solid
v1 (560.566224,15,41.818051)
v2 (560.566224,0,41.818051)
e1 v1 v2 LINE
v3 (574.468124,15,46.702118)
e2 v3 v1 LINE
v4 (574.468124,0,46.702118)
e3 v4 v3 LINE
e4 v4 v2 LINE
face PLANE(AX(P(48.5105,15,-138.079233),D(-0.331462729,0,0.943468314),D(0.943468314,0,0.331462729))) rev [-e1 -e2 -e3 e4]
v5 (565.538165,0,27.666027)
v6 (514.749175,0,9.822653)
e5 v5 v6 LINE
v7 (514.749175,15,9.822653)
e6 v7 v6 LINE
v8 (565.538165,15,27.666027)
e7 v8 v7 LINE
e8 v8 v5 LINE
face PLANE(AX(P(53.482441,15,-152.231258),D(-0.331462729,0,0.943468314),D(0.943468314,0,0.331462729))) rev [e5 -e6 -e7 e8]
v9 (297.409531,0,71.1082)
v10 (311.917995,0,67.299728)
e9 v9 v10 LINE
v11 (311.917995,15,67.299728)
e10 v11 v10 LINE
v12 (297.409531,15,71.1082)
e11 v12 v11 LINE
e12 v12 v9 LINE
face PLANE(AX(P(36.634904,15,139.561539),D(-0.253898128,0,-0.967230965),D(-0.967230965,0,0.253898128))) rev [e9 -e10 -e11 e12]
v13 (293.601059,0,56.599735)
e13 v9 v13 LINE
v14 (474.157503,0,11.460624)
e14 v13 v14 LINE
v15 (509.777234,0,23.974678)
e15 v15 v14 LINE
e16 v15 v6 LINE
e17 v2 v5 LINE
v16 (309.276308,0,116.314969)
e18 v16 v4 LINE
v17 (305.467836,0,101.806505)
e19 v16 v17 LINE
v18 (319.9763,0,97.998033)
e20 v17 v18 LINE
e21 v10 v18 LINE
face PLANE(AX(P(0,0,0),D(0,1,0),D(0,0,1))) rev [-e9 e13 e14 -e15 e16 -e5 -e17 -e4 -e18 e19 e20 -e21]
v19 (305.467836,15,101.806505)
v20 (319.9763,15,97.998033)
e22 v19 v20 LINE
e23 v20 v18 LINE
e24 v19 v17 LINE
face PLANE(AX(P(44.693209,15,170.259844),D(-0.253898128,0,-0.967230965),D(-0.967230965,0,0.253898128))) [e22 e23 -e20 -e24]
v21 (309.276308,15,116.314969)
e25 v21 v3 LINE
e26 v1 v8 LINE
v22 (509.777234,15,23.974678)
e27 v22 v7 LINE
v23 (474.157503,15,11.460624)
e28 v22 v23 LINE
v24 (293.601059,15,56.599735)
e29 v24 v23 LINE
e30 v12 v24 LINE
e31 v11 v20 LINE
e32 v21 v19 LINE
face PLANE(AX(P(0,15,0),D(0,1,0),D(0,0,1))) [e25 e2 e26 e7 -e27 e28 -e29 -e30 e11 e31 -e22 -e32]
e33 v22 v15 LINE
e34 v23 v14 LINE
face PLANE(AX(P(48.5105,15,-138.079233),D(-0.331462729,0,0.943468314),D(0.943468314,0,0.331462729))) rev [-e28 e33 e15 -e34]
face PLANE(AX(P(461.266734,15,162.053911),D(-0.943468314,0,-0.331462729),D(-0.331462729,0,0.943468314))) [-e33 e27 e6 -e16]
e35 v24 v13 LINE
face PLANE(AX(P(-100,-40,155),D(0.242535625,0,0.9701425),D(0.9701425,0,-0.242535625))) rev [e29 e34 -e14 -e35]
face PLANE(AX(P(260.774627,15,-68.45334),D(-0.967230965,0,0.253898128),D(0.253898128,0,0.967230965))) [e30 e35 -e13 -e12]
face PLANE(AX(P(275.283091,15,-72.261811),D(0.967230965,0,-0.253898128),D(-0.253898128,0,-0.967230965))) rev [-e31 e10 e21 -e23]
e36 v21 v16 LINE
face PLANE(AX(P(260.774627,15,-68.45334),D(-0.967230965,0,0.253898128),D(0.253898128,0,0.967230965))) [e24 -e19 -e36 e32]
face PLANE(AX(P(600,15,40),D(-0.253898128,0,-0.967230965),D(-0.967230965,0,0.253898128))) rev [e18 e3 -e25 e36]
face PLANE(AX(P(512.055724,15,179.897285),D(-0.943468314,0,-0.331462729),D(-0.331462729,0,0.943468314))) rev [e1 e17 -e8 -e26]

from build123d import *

# Parameters (mm, degrees)
BOSS_EXTRUDE1_DEPTH             = 15
BOSS_EXTRUDE2_REACH             = 1239.023
BOSS_EXTRUDE2_DIRECTION_2_REACH = 1239.023
CUT_EXTRUDE2_DEPTH              = 1238.578280352
CUT_EXTRUDE2_DEPTH_BACK         = 1238.578280352
SKETCH5_W                       = 40
SKETCH5_H                       = 40
CUT_EXTRUDE3_DEPTH              = 1238.578280352
BOSS_EXTRUDE4_DEPTH             = 75
CUT_EXTRUDE4_DEPTH              = 1241.107934819
CUT_EXTRUDE4_DEPTH_BACK         = 1241.107934819
SKETCH8_W                       = 15
SKETCH8_H                       = 73.7
FILLET1_R                       = 5
CUT_EXTRUDE5_DEPTH              = 1241.107934819
CUT_EXTRUDE5_DEPTH_BACK         = 1241.107934819
SKETCH9_W                       = 25
SKETCH9_H                       = 15
SKETCH9_W_2                     = 15
CUT_EXTRUDE6_DEPTH              = 1241.107934819
CUT_EXTRUDE6_DEPTH_BACK         = 1241.107934819
SKETCH10_W                      = 1728.920732784
SKETCH10_H                      = 178.853868908
SKETCH10_W_2                    = 1650
SKETCH10_H_2                    = 15
SKETCH11_W                      = 1852.680615207
SKETCH11_H                      = 1075.927112831
CUT_EXTRUDE7_DEPTH              = 1238.022635201


with BuildPart() as part:
    # Sketch1 → Boss-Extrude1 (new body)
    with BuildSketch(Plane(origin=(0, 0, 0), x_dir=(1, 0, 0), z_dir=(0, 1, 0))):
        Polygon((-450, 300), (-400, 300), (-200, 250), (600, 40), (1200, 40), (1200, -40), (600, -40), (-200, -250), (-400, -300), (-450, -300), align=None)
    extrude(amount=BOSS_EXTRUDE1_DEPTH)

    # Boss-Extrude2: up to this face of the body (flat: up to its plane)
    boss_extrude2_end = Plane(part.part.faces().sort_by_distance((-425, 7.5, 300))[0])
    # Sketch2 → Boss-Extrude2 (add, up to the picked face)
    with BuildSketch(Plane.XY, mode=Mode.PRIVATE) as boss_extrude2_sk1:
        with BuildLine():
            Line((-425, 0), (-450, 0))
            Line((-450, 0), (-450, -40))
            Line((-450, -40), (-440, -40))
            Line((-440, -40), (-440, -15))
            ThreePointArc((-440, -15), (-435.606601718, -4.393398282), (-425, 0))
        make_face()
    boss_extrude2_tool1 = split(extrude(boss_extrude2_sk1.sketch, amount=BOSS_EXTRUDE2_REACH, mode=Mode.PRIVATE), bisect_by=boss_extrude2_end, keep=Keep.BOTH, mode=Mode.PRIVATE)
    # Sketch2 → Boss-Extrude2 (add, up to the picked face)
    with BuildSketch(Plane.XY, mode=Mode.PRIVATE) as boss_extrude2_sk2:
        with BuildLine():
            Line((-400, 0), (-425, 0))
            ThreePointArc((-425, 0), (-414.393398282, -4.393398282), (-410, -15))
            Line((-410, -15), (-410, -40))
            Line((-410, -40), (-400, -40))
            Line((-400, -40), (-400, 0))
        make_face()
    boss_extrude2_tool2 = split(extrude(boss_extrude2_sk2.sketch, amount=BOSS_EXTRUDE2_REACH, mode=Mode.PRIVATE), bisect_by=boss_extrude2_end, keep=Keep.BOTH, mode=Mode.PRIVATE)
    add(boss_extrude2_tool1.solids().sort_by(Axis((-444.100555, -18.206662, 0), (0, 0, 1)))[0])
    add(boss_extrude2_tool2.solids().sort_by(Axis((-405.899445, -18.206662, 0), (0, 0, 1)))[0])

    # Boss-Extrude2 direction 2: up to this face of the body (flat: up to its plane)
    boss_extrude2_direction_2_end = Plane(part.part.faces().sort_by_distance((-425, 7.5, -300))[0])
    # Sketch2 → Boss-Extrude2 direction 2 (add, up to the picked face)
    with BuildSketch(Plane.XY, mode=Mode.PRIVATE) as boss_extrude2_direction_2_sk1:
        with BuildLine():
            Line((-425, 0), (-450, 0))
            Line((-450, 0), (-450, -40))
            Line((-450, -40), (-440, -40))
            Line((-440, -40), (-440, -15))
            ThreePointArc((-440, -15), (-435.606601718, -4.393398282), (-425, 0))
        make_face()
    boss_extrude2_direction_2_tool1 = split(extrude(boss_extrude2_direction_2_sk1.sketch, amount=-BOSS_EXTRUDE2_DIRECTION_2_REACH, mode=Mode.PRIVATE), bisect_by=boss_extrude2_direction_2_end, keep=Keep.BOTH, mode=Mode.PRIVATE)
    # Sketch2 → Boss-Extrude2 direction 2 (add, up to the picked face)
    with BuildSketch(Plane.XY, mode=Mode.PRIVATE) as boss_extrude2_direction_2_sk2:
        with BuildLine():
            Line((-400, 0), (-425, 0))
            ThreePointArc((-425, 0), (-414.393398282, -4.393398282), (-410, -15))
            Line((-410, -15), (-410, -40))
            Line((-410, -40), (-400, -40))
            Line((-400, -40), (-400, 0))
        make_face()
    boss_extrude2_direction_2_tool2 = split(extrude(boss_extrude2_direction_2_sk2.sketch, amount=-BOSS_EXTRUDE2_DIRECTION_2_REACH, mode=Mode.PRIVATE), bisect_by=boss_extrude2_direction_2_end, keep=Keep.BOTH, mode=Mode.PRIVATE)
    add(boss_extrude2_direction_2_tool1.solids().sort_by(Axis((-444.100555, -18.206662, 0), (0, 0, -1)))[0])
    add(boss_extrude2_direction_2_tool2.solids().sort_by(Axis((-405.899445, -18.206662, 0), (0, 0, -1)))[0])

    # Sketch4 → Cut-Extrude2 (cut, two sides: drawn at the far end of the back side and taken through both)
    with BuildSketch(Plane(origin=(0, 0, 0), x_dir=(1, 0, 0), z_dir=(0, 1, 0)).offset(-CUT_EXTRUDE2_DEPTH_BACK)):
        Polygon((-450, 230), (-400, 230), (-150, 167.5), (-150, -167.5), (-400, -230), (-450, -230), align=None)
        Polygon((-100, 155), (-100, -155), (520, 0), align=None)
    extrude(amount=CUT_EXTRUDE2_DEPTH + CUT_EXTRUDE2_DEPTH_BACK, mode=Mode.SUBTRACT)

    # Sketch5 → Cut-Extrude3 (cut, through all)
    with BuildSketch(Plane(origin=(0, 0, 0), x_dir=(0, 0, -1), z_dir=(1, 0, 0))):
        with Locations((-265, -20)):
            Rectangle(SKETCH5_W, SKETCH5_H)
        with Locations((265, -20)):
            Rectangle(SKETCH5_W, SKETCH5_H)
    extrude(amount=-CUT_EXTRUDE3_DEPTH, mode=Mode.SUBTRACT)

    # Sketch7 → Boss-Extrude4 (add)
    with BuildSketch(Plane(origin=(1200, 0, 0), x_dir=(0, 0, -1), z_dir=(1, 0, 0))):
        with BuildLine():
            Line((-87.5, 50), (-40, 15))
            Line((-40, 15), (40, 15))
            Line((40, 15), (87.5, 50))
            Line((87.5, 50), (87.5, 88.7))
            Line((87.5, 88.7), (58.5, 88.7))
            Line((58.5, 88.7), (58.5, 63.2))
            Line((58.5, 63.2), (48.5, 63.2))
            Line((48.5, 63.2), (48.5, 88.7))
            Line((48.5, 88.7), (20, 88.7))
            Line((20, 88.7), (20, 50))
            ThreePointArc((20, 50), (0, 30), (-20, 50))
            Line((-20, 50), (-20, 88.7))
            Line((-20, 88.7), (-63, 88.7))
            Line((-63, 88.7), (-63, 63.2))
            Line((-63, 63.2), (-73, 63.2))
            Line((-73, 63.2), (-73, 88.7))
            Line((-73, 88.7), (-87.5, 88.7))
            Line((-87.5, 88.7), (-87.5, 50))
        make_face()
    extrude(amount=-BOSS_EXTRUDE4_DEPTH)

    # Sketch8 → Cut-Extrude4 (cut, two sides: drawn at the far end of the back side and taken through both)
    with BuildSketch(Plane.XY.offset(-CUT_EXTRUDE4_DEPTH_BACK)):
        with Locations((1147.5, 51.85)):
            Rectangle(SKETCH8_W, SKETCH8_H)
        with Locations((1177.5, 51.85)):
            Rectangle(SKETCH8_W, SKETCH8_H)
    extrude(amount=CUT_EXTRUDE4_DEPTH + CUT_EXTRUDE4_DEPTH_BACK, mode=Mode.SUBTRACT)

    # Fillet1
    fillet1_edges = [part.edges().sort_by_distance(p)[0] for p in [
        (1192.5, 50, 87.5),
        (1162.5, 50, 87.5),
        (1132.5, 50, 87.5),
        (1192.5, 50, -87.5),
        (1162.5, 50, -87.5),
        (1132.5, 50, -87.5),
        (1192.5, 88.7, -87.5),
        (1162.5, 88.7, -87.5),
        (1132.5, 88.7, -87.5),
        (1132.5, 88.7, -58.5),
        (1162.5, 88.7, -58.5),
        (1192.5, 88.7, -58.5),
        (1192.5, 88.7, -48.5),
        (1162.5, 88.7, -48.5),
        (1132.5, 88.7, -48.5),
        (1192.5, 88.7, -20),
        (1162.5, 88.7, -20),
        (1132.5, 88.7, -20),
        (1192.5, 88.7, 63),
        (1162.5, 88.7, 63),
        (1132.5, 88.7, 63),
        (1132.5, 88.7, 87.5),
        (1162.5, 88.7, 87.5),
        (1192.5, 88.7, 87.5),
        (1192.5, 88.7, 73),
        (1162.5, 88.7, 73),
        (1132.5, 88.7, 73),
        (1192.5, 88.7, 20),
        (1162.5, 88.7, 20),
        (1132.5, 88.7, 20),
        (600, 7.5, 40),
        (600, 7.5, -40),
        (520, 7.5, 0),
        (-440, -40, -292.5),
        (-440, -40, -237.5),
        (-400, -40, -292.5),
        (-400, -40, -237.5),
        (-450, -40, -237.5),
        (-410, -40, -237.5),
        (-450, -40, -292.5),
        (-410, -40, -292.5),
        (-150, 7.5, 167.5),
        (-100, 7.5, 155),
        (-150, 7.5, -167.5),
        (-100, 7.5, -155),
        (-450, -40, 237.5),
        (-410, -40, 237.5),
        (-440, -40, 237.5),
        (-400, -40, 237.5),
        (-450, -40, 292.5),
        (-440, -40, 292.5),
        (-400, -40, 292.5),
        (-410, -40, 292.5),
    ]]
    fillet(fillet1_edges, radius=FILLET1_R - 0.0001)  # a hair under: the kernel refuses the full size

    # Sketch9 → Cut-Extrude5 (cut, two sides: drawn at the far end of the back side and taken through both)
    with BuildSketch(Plane(origin=(0, 0, 0), x_dir=(1, 0, 0), z_dir=(0, 1, 0)).offset(-CUT_EXTRUDE5_DEPTH_BACK)):
        with Locations((-425, -292.5)):
            Rectangle(SKETCH9_W, SKETCH9_H)
        with Locations((1192.5, -32.5)):
            Rectangle(SKETCH9_W_2, SKETCH9_H)
        with Locations((1192.5, 32.5)):
            Rectangle(SKETCH9_W_2, SKETCH9_H)
        with Locations((1162.5, 32.5)):
            Rectangle(SKETCH9_W_2, SKETCH9_H)
        with Locations((1132.5, 32.5)):
            Rectangle(SKETCH9_W_2, SKETCH9_H)
        with Locations((1132.5, -32.5)):
            Rectangle(SKETCH9_W_2, SKETCH9_H)
        with Locations((1162.5, -32.5)):
            Rectangle(SKETCH9_W_2, SKETCH9_H)
        with Locations((-425, -237.5)):
            Rectangle(SKETCH9_W, SKETCH9_H)
        with Locations((-425, 237.5)):
            Rectangle(SKETCH9_W, SKETCH9_H)
        with Locations((-425, 292.5)):
            Rectangle(SKETCH9_W, SKETCH9_H)
    extrude(amount=CUT_EXTRUDE5_DEPTH + CUT_EXTRUDE5_DEPTH_BACK, mode=Mode.SUBTRACT)


with BuildPart() as cut_extrude5_piece_1:
    # of the separate pieces the step leaves, piece 1, a body of its own (cut_extrude5_pieces)
    add(part.part.solids().sort_by_distance((-400, -35.0001, -300))[0])


with BuildPart() as cut_extrude5_piece_2:
    # of the separate pieces the step leaves, piece 2, a body of its own (cut_extrude5_pieces)
    add(part.part.solids().sort_by_distance((1170, 48.501289589, 85.46603587))[0])


with BuildPart() as cut_extrude5_piece_3:
    # of the separate pieces the step leaves, piece 3, a body of its own (cut_extrude5_pieces)
    add(part.part.solids().sort_by_distance((1170, 48.501289589, -85.46603587))[0])


with BuildPart() as cut_extrude5_piece_4:
    # of the separate pieces the step leaves, piece 4, a body of its own (cut_extrude5_pieces)
    add(part.part.solids().sort_by_distance((1125, 83.7001, 73))[0])


with BuildPart() as cut_extrude5_piece_5:
    # of the separate pieces the step leaves, piece 5, a body of its own (cut_extrude5_pieces)
    add(part.part.solids().sort_by_distance((1200, 48.501289589, 85.46603587))[0])


with BuildPart() as cut_extrude5_piece_6:
    # of the separate pieces the step leaves, piece 6, a body of its own (cut_extrude5_pieces)
    add(part.part.solids().sort_by_distance((1200, 48.501289589, -85.46603587))[0])


with BuildPart() as cut_extrude5_piece_7:
    # of the separate pieces the step leaves, piece 7, a body of its own (cut_extrude5_pieces)
    add(part.part.solids().sort_by_distance((1125, 88.7, -40))[0])


with BuildPart() as cut_extrude6_tool:
    # Sketch10 → Cut-Extrude6 (new, two sides: drawn at the far end of the back side and taken through both)
    with BuildSketch(Plane.XY.offset(-CUT_EXTRUDE6_DEPTH_BACK)):
        with Locations((378.379601058, 20.599691165)):
            Rectangle(SKETCH10_W, SKETCH10_H)
        with Locations((375, 7.5)):
            Rectangle(SKETCH10_W_2, SKETCH10_H_2, mode=Mode.SUBTRACT)
    extrude(amount=CUT_EXTRUDE6_DEPTH + CUT_EXTRUDE6_DEPTH_BACK)


with BuildPart() as cut_extrude5_piece_1_1:
    add(cut_extrude5_piece_1.part)

    # Cut-Extrude6: cut by cut_extrude6_tool
    add(cut_extrude6_tool.part, mode=Mode.SUBTRACT)

    # Sketch11 → Cut-Extrude7 (cut, through all)
    # profile 1 of 8: a face of its own
    with BuildSketch(Plane(origin=(0, 0, 0), x_dir=(1, 0, 0), z_dir=(0, 1, 0))):
        with Locations((324.970767393, -26.108881651)):
            Rectangle(SKETCH11_W, SKETCH11_H)
        Polygon((309.276307823, -116.314969197), (-450, -315.625), (-450, -242.5), (-450, -230), (-400, -230), (-150, -167.5), (-135, -163.75), (-115, -158.75), (-100, -155), (293.601058917, -56.599735271), (308.154197556, -52.961450611), (474.15750273, -11.460624318), (500.597149997, -4.850712501), (514.749174704, -9.82265344), (565.538165046, -27.666026778), (600.645318554, -40), (574.718248814, -46.789992423), (323.784772304, -112.50649727), align=None, mode=Mode.SUBTRACT)
    # profile 2 of 8: a face of its own
    with BuildSketch(Plane(origin=(0, 0, 0), x_dir=(1, 0, 0), z_dir=(0, 1, 0))):
        Polygon((-450, -230), (-450, -242.5), (-400, -230), align=None)
    # profile 3 of 8: a face of its own
    with BuildSketch(Plane(origin=(0, 0, 0), x_dir=(1, 0, 0), z_dir=(0, 1, 0))):
        Polygon((-450, -242.5), (-450, -315.625), (309.276307823, -116.314969197), (305.467835897, -101.806504716), (297.409530844, -71.108199751), (293.601058917, -56.599735271), (-100, -155), (-100, -182.5), (-115, -182.5), (-115, -158.75), (-135, -163.75), (-135, -182.5), (-150, -182.5), (-150, -167.5), (-400, -230), align=None)
    # profile 4 of 8: a face of its own
    with BuildSketch(Plane(origin=(0, 0, 0), x_dir=(1, 0, 0), z_dir=(0, 1, 0))):
        Polygon((-135, -163.75), (-150, -167.5), (-150, -182.5), (-135, -182.5), align=None)
    # profile 5 of 8: a face of its own
    with BuildSketch(Plane(origin=(0, 0, 0), x_dir=(1, 0, 0), z_dir=(0, 1, 0))):
        Polygon((-100, -182.5), (-100, -155), (-115, -158.75), (-115, -182.5), align=None)
    # profile 6 of 8: a face of its own
    with BuildSketch(Plane(origin=(0, 0, 0), x_dir=(1, 0, 0), z_dir=(0, 1, 0))):
        Polygon((560.566224107, -41.818051484), (574.718248814, -46.789992423), (600.645318554, -40), (565.538165046, -27.666026778), align=None)
    # profile 7 of 8: a face of its own
    with BuildSketch(Plane(origin=(0, 0, 0), x_dir=(1, 0, 0), z_dir=(0, 1, 0))):
        Polygon((474.15750273, -11.460624318), (509.777233765, -23.974678146), (514.749174704, -9.82265344), (500.597149997, -4.850712501), align=None)
    # profile 8 of 8: a face of its own
    with BuildSketch(Plane(origin=(0, 0, 0), x_dir=(1, 0, 0), z_dir=(0, 1, 0))):
        Polygon((297.409530844, -71.108199751), (305.467835897, -101.806504716), (319.976300377, -97.99803279), (311.917995324, -67.299727825), align=None)
    extrude(amount=CUT_EXTRUDE7_DEPTH, mode=Mode.SUBTRACT)


with BuildPart() as cut_extrude5_piece_2_1:
    add(cut_extrude5_piece_2.part)

    # Cut-Extrude6: cut by cut_extrude6_tool
    add(cut_extrude6_tool.part, mode=Mode.SUBTRACT)


with BuildPart() as cut_extrude5_piece_3_1:
    add(cut_extrude5_piece_3.part)

    # Cut-Extrude6: cut by cut_extrude6_tool
    add(cut_extrude6_tool.part, mode=Mode.SUBTRACT)


with BuildPart() as cut_extrude5_piece_4_1:
    add(cut_extrude5_piece_4.part)

    # Cut-Extrude6: cut by cut_extrude6_tool
    add(cut_extrude6_tool.part, mode=Mode.SUBTRACT)


with BuildPart() as cut_extrude5_piece_5_1:
    add(cut_extrude5_piece_5.part)

    # Cut-Extrude6: cut by cut_extrude6_tool
    add(cut_extrude6_tool.part, mode=Mode.SUBTRACT)


with BuildPart() as cut_extrude5_piece_6_1:
    add(cut_extrude5_piece_6.part)

    # Cut-Extrude6: cut by cut_extrude6_tool
    add(cut_extrude6_tool.part, mode=Mode.SUBTRACT)


with BuildPart() as cut_extrude5_piece_7_1:
    add(cut_extrude5_piece_7.part)

    # Cut-Extrude6: cut by cut_extrude6_tool
    add(cut_extrude6_tool.part, mode=Mode.SUBTRACT)


solid = cut_extrude5_piece_1_1.part
